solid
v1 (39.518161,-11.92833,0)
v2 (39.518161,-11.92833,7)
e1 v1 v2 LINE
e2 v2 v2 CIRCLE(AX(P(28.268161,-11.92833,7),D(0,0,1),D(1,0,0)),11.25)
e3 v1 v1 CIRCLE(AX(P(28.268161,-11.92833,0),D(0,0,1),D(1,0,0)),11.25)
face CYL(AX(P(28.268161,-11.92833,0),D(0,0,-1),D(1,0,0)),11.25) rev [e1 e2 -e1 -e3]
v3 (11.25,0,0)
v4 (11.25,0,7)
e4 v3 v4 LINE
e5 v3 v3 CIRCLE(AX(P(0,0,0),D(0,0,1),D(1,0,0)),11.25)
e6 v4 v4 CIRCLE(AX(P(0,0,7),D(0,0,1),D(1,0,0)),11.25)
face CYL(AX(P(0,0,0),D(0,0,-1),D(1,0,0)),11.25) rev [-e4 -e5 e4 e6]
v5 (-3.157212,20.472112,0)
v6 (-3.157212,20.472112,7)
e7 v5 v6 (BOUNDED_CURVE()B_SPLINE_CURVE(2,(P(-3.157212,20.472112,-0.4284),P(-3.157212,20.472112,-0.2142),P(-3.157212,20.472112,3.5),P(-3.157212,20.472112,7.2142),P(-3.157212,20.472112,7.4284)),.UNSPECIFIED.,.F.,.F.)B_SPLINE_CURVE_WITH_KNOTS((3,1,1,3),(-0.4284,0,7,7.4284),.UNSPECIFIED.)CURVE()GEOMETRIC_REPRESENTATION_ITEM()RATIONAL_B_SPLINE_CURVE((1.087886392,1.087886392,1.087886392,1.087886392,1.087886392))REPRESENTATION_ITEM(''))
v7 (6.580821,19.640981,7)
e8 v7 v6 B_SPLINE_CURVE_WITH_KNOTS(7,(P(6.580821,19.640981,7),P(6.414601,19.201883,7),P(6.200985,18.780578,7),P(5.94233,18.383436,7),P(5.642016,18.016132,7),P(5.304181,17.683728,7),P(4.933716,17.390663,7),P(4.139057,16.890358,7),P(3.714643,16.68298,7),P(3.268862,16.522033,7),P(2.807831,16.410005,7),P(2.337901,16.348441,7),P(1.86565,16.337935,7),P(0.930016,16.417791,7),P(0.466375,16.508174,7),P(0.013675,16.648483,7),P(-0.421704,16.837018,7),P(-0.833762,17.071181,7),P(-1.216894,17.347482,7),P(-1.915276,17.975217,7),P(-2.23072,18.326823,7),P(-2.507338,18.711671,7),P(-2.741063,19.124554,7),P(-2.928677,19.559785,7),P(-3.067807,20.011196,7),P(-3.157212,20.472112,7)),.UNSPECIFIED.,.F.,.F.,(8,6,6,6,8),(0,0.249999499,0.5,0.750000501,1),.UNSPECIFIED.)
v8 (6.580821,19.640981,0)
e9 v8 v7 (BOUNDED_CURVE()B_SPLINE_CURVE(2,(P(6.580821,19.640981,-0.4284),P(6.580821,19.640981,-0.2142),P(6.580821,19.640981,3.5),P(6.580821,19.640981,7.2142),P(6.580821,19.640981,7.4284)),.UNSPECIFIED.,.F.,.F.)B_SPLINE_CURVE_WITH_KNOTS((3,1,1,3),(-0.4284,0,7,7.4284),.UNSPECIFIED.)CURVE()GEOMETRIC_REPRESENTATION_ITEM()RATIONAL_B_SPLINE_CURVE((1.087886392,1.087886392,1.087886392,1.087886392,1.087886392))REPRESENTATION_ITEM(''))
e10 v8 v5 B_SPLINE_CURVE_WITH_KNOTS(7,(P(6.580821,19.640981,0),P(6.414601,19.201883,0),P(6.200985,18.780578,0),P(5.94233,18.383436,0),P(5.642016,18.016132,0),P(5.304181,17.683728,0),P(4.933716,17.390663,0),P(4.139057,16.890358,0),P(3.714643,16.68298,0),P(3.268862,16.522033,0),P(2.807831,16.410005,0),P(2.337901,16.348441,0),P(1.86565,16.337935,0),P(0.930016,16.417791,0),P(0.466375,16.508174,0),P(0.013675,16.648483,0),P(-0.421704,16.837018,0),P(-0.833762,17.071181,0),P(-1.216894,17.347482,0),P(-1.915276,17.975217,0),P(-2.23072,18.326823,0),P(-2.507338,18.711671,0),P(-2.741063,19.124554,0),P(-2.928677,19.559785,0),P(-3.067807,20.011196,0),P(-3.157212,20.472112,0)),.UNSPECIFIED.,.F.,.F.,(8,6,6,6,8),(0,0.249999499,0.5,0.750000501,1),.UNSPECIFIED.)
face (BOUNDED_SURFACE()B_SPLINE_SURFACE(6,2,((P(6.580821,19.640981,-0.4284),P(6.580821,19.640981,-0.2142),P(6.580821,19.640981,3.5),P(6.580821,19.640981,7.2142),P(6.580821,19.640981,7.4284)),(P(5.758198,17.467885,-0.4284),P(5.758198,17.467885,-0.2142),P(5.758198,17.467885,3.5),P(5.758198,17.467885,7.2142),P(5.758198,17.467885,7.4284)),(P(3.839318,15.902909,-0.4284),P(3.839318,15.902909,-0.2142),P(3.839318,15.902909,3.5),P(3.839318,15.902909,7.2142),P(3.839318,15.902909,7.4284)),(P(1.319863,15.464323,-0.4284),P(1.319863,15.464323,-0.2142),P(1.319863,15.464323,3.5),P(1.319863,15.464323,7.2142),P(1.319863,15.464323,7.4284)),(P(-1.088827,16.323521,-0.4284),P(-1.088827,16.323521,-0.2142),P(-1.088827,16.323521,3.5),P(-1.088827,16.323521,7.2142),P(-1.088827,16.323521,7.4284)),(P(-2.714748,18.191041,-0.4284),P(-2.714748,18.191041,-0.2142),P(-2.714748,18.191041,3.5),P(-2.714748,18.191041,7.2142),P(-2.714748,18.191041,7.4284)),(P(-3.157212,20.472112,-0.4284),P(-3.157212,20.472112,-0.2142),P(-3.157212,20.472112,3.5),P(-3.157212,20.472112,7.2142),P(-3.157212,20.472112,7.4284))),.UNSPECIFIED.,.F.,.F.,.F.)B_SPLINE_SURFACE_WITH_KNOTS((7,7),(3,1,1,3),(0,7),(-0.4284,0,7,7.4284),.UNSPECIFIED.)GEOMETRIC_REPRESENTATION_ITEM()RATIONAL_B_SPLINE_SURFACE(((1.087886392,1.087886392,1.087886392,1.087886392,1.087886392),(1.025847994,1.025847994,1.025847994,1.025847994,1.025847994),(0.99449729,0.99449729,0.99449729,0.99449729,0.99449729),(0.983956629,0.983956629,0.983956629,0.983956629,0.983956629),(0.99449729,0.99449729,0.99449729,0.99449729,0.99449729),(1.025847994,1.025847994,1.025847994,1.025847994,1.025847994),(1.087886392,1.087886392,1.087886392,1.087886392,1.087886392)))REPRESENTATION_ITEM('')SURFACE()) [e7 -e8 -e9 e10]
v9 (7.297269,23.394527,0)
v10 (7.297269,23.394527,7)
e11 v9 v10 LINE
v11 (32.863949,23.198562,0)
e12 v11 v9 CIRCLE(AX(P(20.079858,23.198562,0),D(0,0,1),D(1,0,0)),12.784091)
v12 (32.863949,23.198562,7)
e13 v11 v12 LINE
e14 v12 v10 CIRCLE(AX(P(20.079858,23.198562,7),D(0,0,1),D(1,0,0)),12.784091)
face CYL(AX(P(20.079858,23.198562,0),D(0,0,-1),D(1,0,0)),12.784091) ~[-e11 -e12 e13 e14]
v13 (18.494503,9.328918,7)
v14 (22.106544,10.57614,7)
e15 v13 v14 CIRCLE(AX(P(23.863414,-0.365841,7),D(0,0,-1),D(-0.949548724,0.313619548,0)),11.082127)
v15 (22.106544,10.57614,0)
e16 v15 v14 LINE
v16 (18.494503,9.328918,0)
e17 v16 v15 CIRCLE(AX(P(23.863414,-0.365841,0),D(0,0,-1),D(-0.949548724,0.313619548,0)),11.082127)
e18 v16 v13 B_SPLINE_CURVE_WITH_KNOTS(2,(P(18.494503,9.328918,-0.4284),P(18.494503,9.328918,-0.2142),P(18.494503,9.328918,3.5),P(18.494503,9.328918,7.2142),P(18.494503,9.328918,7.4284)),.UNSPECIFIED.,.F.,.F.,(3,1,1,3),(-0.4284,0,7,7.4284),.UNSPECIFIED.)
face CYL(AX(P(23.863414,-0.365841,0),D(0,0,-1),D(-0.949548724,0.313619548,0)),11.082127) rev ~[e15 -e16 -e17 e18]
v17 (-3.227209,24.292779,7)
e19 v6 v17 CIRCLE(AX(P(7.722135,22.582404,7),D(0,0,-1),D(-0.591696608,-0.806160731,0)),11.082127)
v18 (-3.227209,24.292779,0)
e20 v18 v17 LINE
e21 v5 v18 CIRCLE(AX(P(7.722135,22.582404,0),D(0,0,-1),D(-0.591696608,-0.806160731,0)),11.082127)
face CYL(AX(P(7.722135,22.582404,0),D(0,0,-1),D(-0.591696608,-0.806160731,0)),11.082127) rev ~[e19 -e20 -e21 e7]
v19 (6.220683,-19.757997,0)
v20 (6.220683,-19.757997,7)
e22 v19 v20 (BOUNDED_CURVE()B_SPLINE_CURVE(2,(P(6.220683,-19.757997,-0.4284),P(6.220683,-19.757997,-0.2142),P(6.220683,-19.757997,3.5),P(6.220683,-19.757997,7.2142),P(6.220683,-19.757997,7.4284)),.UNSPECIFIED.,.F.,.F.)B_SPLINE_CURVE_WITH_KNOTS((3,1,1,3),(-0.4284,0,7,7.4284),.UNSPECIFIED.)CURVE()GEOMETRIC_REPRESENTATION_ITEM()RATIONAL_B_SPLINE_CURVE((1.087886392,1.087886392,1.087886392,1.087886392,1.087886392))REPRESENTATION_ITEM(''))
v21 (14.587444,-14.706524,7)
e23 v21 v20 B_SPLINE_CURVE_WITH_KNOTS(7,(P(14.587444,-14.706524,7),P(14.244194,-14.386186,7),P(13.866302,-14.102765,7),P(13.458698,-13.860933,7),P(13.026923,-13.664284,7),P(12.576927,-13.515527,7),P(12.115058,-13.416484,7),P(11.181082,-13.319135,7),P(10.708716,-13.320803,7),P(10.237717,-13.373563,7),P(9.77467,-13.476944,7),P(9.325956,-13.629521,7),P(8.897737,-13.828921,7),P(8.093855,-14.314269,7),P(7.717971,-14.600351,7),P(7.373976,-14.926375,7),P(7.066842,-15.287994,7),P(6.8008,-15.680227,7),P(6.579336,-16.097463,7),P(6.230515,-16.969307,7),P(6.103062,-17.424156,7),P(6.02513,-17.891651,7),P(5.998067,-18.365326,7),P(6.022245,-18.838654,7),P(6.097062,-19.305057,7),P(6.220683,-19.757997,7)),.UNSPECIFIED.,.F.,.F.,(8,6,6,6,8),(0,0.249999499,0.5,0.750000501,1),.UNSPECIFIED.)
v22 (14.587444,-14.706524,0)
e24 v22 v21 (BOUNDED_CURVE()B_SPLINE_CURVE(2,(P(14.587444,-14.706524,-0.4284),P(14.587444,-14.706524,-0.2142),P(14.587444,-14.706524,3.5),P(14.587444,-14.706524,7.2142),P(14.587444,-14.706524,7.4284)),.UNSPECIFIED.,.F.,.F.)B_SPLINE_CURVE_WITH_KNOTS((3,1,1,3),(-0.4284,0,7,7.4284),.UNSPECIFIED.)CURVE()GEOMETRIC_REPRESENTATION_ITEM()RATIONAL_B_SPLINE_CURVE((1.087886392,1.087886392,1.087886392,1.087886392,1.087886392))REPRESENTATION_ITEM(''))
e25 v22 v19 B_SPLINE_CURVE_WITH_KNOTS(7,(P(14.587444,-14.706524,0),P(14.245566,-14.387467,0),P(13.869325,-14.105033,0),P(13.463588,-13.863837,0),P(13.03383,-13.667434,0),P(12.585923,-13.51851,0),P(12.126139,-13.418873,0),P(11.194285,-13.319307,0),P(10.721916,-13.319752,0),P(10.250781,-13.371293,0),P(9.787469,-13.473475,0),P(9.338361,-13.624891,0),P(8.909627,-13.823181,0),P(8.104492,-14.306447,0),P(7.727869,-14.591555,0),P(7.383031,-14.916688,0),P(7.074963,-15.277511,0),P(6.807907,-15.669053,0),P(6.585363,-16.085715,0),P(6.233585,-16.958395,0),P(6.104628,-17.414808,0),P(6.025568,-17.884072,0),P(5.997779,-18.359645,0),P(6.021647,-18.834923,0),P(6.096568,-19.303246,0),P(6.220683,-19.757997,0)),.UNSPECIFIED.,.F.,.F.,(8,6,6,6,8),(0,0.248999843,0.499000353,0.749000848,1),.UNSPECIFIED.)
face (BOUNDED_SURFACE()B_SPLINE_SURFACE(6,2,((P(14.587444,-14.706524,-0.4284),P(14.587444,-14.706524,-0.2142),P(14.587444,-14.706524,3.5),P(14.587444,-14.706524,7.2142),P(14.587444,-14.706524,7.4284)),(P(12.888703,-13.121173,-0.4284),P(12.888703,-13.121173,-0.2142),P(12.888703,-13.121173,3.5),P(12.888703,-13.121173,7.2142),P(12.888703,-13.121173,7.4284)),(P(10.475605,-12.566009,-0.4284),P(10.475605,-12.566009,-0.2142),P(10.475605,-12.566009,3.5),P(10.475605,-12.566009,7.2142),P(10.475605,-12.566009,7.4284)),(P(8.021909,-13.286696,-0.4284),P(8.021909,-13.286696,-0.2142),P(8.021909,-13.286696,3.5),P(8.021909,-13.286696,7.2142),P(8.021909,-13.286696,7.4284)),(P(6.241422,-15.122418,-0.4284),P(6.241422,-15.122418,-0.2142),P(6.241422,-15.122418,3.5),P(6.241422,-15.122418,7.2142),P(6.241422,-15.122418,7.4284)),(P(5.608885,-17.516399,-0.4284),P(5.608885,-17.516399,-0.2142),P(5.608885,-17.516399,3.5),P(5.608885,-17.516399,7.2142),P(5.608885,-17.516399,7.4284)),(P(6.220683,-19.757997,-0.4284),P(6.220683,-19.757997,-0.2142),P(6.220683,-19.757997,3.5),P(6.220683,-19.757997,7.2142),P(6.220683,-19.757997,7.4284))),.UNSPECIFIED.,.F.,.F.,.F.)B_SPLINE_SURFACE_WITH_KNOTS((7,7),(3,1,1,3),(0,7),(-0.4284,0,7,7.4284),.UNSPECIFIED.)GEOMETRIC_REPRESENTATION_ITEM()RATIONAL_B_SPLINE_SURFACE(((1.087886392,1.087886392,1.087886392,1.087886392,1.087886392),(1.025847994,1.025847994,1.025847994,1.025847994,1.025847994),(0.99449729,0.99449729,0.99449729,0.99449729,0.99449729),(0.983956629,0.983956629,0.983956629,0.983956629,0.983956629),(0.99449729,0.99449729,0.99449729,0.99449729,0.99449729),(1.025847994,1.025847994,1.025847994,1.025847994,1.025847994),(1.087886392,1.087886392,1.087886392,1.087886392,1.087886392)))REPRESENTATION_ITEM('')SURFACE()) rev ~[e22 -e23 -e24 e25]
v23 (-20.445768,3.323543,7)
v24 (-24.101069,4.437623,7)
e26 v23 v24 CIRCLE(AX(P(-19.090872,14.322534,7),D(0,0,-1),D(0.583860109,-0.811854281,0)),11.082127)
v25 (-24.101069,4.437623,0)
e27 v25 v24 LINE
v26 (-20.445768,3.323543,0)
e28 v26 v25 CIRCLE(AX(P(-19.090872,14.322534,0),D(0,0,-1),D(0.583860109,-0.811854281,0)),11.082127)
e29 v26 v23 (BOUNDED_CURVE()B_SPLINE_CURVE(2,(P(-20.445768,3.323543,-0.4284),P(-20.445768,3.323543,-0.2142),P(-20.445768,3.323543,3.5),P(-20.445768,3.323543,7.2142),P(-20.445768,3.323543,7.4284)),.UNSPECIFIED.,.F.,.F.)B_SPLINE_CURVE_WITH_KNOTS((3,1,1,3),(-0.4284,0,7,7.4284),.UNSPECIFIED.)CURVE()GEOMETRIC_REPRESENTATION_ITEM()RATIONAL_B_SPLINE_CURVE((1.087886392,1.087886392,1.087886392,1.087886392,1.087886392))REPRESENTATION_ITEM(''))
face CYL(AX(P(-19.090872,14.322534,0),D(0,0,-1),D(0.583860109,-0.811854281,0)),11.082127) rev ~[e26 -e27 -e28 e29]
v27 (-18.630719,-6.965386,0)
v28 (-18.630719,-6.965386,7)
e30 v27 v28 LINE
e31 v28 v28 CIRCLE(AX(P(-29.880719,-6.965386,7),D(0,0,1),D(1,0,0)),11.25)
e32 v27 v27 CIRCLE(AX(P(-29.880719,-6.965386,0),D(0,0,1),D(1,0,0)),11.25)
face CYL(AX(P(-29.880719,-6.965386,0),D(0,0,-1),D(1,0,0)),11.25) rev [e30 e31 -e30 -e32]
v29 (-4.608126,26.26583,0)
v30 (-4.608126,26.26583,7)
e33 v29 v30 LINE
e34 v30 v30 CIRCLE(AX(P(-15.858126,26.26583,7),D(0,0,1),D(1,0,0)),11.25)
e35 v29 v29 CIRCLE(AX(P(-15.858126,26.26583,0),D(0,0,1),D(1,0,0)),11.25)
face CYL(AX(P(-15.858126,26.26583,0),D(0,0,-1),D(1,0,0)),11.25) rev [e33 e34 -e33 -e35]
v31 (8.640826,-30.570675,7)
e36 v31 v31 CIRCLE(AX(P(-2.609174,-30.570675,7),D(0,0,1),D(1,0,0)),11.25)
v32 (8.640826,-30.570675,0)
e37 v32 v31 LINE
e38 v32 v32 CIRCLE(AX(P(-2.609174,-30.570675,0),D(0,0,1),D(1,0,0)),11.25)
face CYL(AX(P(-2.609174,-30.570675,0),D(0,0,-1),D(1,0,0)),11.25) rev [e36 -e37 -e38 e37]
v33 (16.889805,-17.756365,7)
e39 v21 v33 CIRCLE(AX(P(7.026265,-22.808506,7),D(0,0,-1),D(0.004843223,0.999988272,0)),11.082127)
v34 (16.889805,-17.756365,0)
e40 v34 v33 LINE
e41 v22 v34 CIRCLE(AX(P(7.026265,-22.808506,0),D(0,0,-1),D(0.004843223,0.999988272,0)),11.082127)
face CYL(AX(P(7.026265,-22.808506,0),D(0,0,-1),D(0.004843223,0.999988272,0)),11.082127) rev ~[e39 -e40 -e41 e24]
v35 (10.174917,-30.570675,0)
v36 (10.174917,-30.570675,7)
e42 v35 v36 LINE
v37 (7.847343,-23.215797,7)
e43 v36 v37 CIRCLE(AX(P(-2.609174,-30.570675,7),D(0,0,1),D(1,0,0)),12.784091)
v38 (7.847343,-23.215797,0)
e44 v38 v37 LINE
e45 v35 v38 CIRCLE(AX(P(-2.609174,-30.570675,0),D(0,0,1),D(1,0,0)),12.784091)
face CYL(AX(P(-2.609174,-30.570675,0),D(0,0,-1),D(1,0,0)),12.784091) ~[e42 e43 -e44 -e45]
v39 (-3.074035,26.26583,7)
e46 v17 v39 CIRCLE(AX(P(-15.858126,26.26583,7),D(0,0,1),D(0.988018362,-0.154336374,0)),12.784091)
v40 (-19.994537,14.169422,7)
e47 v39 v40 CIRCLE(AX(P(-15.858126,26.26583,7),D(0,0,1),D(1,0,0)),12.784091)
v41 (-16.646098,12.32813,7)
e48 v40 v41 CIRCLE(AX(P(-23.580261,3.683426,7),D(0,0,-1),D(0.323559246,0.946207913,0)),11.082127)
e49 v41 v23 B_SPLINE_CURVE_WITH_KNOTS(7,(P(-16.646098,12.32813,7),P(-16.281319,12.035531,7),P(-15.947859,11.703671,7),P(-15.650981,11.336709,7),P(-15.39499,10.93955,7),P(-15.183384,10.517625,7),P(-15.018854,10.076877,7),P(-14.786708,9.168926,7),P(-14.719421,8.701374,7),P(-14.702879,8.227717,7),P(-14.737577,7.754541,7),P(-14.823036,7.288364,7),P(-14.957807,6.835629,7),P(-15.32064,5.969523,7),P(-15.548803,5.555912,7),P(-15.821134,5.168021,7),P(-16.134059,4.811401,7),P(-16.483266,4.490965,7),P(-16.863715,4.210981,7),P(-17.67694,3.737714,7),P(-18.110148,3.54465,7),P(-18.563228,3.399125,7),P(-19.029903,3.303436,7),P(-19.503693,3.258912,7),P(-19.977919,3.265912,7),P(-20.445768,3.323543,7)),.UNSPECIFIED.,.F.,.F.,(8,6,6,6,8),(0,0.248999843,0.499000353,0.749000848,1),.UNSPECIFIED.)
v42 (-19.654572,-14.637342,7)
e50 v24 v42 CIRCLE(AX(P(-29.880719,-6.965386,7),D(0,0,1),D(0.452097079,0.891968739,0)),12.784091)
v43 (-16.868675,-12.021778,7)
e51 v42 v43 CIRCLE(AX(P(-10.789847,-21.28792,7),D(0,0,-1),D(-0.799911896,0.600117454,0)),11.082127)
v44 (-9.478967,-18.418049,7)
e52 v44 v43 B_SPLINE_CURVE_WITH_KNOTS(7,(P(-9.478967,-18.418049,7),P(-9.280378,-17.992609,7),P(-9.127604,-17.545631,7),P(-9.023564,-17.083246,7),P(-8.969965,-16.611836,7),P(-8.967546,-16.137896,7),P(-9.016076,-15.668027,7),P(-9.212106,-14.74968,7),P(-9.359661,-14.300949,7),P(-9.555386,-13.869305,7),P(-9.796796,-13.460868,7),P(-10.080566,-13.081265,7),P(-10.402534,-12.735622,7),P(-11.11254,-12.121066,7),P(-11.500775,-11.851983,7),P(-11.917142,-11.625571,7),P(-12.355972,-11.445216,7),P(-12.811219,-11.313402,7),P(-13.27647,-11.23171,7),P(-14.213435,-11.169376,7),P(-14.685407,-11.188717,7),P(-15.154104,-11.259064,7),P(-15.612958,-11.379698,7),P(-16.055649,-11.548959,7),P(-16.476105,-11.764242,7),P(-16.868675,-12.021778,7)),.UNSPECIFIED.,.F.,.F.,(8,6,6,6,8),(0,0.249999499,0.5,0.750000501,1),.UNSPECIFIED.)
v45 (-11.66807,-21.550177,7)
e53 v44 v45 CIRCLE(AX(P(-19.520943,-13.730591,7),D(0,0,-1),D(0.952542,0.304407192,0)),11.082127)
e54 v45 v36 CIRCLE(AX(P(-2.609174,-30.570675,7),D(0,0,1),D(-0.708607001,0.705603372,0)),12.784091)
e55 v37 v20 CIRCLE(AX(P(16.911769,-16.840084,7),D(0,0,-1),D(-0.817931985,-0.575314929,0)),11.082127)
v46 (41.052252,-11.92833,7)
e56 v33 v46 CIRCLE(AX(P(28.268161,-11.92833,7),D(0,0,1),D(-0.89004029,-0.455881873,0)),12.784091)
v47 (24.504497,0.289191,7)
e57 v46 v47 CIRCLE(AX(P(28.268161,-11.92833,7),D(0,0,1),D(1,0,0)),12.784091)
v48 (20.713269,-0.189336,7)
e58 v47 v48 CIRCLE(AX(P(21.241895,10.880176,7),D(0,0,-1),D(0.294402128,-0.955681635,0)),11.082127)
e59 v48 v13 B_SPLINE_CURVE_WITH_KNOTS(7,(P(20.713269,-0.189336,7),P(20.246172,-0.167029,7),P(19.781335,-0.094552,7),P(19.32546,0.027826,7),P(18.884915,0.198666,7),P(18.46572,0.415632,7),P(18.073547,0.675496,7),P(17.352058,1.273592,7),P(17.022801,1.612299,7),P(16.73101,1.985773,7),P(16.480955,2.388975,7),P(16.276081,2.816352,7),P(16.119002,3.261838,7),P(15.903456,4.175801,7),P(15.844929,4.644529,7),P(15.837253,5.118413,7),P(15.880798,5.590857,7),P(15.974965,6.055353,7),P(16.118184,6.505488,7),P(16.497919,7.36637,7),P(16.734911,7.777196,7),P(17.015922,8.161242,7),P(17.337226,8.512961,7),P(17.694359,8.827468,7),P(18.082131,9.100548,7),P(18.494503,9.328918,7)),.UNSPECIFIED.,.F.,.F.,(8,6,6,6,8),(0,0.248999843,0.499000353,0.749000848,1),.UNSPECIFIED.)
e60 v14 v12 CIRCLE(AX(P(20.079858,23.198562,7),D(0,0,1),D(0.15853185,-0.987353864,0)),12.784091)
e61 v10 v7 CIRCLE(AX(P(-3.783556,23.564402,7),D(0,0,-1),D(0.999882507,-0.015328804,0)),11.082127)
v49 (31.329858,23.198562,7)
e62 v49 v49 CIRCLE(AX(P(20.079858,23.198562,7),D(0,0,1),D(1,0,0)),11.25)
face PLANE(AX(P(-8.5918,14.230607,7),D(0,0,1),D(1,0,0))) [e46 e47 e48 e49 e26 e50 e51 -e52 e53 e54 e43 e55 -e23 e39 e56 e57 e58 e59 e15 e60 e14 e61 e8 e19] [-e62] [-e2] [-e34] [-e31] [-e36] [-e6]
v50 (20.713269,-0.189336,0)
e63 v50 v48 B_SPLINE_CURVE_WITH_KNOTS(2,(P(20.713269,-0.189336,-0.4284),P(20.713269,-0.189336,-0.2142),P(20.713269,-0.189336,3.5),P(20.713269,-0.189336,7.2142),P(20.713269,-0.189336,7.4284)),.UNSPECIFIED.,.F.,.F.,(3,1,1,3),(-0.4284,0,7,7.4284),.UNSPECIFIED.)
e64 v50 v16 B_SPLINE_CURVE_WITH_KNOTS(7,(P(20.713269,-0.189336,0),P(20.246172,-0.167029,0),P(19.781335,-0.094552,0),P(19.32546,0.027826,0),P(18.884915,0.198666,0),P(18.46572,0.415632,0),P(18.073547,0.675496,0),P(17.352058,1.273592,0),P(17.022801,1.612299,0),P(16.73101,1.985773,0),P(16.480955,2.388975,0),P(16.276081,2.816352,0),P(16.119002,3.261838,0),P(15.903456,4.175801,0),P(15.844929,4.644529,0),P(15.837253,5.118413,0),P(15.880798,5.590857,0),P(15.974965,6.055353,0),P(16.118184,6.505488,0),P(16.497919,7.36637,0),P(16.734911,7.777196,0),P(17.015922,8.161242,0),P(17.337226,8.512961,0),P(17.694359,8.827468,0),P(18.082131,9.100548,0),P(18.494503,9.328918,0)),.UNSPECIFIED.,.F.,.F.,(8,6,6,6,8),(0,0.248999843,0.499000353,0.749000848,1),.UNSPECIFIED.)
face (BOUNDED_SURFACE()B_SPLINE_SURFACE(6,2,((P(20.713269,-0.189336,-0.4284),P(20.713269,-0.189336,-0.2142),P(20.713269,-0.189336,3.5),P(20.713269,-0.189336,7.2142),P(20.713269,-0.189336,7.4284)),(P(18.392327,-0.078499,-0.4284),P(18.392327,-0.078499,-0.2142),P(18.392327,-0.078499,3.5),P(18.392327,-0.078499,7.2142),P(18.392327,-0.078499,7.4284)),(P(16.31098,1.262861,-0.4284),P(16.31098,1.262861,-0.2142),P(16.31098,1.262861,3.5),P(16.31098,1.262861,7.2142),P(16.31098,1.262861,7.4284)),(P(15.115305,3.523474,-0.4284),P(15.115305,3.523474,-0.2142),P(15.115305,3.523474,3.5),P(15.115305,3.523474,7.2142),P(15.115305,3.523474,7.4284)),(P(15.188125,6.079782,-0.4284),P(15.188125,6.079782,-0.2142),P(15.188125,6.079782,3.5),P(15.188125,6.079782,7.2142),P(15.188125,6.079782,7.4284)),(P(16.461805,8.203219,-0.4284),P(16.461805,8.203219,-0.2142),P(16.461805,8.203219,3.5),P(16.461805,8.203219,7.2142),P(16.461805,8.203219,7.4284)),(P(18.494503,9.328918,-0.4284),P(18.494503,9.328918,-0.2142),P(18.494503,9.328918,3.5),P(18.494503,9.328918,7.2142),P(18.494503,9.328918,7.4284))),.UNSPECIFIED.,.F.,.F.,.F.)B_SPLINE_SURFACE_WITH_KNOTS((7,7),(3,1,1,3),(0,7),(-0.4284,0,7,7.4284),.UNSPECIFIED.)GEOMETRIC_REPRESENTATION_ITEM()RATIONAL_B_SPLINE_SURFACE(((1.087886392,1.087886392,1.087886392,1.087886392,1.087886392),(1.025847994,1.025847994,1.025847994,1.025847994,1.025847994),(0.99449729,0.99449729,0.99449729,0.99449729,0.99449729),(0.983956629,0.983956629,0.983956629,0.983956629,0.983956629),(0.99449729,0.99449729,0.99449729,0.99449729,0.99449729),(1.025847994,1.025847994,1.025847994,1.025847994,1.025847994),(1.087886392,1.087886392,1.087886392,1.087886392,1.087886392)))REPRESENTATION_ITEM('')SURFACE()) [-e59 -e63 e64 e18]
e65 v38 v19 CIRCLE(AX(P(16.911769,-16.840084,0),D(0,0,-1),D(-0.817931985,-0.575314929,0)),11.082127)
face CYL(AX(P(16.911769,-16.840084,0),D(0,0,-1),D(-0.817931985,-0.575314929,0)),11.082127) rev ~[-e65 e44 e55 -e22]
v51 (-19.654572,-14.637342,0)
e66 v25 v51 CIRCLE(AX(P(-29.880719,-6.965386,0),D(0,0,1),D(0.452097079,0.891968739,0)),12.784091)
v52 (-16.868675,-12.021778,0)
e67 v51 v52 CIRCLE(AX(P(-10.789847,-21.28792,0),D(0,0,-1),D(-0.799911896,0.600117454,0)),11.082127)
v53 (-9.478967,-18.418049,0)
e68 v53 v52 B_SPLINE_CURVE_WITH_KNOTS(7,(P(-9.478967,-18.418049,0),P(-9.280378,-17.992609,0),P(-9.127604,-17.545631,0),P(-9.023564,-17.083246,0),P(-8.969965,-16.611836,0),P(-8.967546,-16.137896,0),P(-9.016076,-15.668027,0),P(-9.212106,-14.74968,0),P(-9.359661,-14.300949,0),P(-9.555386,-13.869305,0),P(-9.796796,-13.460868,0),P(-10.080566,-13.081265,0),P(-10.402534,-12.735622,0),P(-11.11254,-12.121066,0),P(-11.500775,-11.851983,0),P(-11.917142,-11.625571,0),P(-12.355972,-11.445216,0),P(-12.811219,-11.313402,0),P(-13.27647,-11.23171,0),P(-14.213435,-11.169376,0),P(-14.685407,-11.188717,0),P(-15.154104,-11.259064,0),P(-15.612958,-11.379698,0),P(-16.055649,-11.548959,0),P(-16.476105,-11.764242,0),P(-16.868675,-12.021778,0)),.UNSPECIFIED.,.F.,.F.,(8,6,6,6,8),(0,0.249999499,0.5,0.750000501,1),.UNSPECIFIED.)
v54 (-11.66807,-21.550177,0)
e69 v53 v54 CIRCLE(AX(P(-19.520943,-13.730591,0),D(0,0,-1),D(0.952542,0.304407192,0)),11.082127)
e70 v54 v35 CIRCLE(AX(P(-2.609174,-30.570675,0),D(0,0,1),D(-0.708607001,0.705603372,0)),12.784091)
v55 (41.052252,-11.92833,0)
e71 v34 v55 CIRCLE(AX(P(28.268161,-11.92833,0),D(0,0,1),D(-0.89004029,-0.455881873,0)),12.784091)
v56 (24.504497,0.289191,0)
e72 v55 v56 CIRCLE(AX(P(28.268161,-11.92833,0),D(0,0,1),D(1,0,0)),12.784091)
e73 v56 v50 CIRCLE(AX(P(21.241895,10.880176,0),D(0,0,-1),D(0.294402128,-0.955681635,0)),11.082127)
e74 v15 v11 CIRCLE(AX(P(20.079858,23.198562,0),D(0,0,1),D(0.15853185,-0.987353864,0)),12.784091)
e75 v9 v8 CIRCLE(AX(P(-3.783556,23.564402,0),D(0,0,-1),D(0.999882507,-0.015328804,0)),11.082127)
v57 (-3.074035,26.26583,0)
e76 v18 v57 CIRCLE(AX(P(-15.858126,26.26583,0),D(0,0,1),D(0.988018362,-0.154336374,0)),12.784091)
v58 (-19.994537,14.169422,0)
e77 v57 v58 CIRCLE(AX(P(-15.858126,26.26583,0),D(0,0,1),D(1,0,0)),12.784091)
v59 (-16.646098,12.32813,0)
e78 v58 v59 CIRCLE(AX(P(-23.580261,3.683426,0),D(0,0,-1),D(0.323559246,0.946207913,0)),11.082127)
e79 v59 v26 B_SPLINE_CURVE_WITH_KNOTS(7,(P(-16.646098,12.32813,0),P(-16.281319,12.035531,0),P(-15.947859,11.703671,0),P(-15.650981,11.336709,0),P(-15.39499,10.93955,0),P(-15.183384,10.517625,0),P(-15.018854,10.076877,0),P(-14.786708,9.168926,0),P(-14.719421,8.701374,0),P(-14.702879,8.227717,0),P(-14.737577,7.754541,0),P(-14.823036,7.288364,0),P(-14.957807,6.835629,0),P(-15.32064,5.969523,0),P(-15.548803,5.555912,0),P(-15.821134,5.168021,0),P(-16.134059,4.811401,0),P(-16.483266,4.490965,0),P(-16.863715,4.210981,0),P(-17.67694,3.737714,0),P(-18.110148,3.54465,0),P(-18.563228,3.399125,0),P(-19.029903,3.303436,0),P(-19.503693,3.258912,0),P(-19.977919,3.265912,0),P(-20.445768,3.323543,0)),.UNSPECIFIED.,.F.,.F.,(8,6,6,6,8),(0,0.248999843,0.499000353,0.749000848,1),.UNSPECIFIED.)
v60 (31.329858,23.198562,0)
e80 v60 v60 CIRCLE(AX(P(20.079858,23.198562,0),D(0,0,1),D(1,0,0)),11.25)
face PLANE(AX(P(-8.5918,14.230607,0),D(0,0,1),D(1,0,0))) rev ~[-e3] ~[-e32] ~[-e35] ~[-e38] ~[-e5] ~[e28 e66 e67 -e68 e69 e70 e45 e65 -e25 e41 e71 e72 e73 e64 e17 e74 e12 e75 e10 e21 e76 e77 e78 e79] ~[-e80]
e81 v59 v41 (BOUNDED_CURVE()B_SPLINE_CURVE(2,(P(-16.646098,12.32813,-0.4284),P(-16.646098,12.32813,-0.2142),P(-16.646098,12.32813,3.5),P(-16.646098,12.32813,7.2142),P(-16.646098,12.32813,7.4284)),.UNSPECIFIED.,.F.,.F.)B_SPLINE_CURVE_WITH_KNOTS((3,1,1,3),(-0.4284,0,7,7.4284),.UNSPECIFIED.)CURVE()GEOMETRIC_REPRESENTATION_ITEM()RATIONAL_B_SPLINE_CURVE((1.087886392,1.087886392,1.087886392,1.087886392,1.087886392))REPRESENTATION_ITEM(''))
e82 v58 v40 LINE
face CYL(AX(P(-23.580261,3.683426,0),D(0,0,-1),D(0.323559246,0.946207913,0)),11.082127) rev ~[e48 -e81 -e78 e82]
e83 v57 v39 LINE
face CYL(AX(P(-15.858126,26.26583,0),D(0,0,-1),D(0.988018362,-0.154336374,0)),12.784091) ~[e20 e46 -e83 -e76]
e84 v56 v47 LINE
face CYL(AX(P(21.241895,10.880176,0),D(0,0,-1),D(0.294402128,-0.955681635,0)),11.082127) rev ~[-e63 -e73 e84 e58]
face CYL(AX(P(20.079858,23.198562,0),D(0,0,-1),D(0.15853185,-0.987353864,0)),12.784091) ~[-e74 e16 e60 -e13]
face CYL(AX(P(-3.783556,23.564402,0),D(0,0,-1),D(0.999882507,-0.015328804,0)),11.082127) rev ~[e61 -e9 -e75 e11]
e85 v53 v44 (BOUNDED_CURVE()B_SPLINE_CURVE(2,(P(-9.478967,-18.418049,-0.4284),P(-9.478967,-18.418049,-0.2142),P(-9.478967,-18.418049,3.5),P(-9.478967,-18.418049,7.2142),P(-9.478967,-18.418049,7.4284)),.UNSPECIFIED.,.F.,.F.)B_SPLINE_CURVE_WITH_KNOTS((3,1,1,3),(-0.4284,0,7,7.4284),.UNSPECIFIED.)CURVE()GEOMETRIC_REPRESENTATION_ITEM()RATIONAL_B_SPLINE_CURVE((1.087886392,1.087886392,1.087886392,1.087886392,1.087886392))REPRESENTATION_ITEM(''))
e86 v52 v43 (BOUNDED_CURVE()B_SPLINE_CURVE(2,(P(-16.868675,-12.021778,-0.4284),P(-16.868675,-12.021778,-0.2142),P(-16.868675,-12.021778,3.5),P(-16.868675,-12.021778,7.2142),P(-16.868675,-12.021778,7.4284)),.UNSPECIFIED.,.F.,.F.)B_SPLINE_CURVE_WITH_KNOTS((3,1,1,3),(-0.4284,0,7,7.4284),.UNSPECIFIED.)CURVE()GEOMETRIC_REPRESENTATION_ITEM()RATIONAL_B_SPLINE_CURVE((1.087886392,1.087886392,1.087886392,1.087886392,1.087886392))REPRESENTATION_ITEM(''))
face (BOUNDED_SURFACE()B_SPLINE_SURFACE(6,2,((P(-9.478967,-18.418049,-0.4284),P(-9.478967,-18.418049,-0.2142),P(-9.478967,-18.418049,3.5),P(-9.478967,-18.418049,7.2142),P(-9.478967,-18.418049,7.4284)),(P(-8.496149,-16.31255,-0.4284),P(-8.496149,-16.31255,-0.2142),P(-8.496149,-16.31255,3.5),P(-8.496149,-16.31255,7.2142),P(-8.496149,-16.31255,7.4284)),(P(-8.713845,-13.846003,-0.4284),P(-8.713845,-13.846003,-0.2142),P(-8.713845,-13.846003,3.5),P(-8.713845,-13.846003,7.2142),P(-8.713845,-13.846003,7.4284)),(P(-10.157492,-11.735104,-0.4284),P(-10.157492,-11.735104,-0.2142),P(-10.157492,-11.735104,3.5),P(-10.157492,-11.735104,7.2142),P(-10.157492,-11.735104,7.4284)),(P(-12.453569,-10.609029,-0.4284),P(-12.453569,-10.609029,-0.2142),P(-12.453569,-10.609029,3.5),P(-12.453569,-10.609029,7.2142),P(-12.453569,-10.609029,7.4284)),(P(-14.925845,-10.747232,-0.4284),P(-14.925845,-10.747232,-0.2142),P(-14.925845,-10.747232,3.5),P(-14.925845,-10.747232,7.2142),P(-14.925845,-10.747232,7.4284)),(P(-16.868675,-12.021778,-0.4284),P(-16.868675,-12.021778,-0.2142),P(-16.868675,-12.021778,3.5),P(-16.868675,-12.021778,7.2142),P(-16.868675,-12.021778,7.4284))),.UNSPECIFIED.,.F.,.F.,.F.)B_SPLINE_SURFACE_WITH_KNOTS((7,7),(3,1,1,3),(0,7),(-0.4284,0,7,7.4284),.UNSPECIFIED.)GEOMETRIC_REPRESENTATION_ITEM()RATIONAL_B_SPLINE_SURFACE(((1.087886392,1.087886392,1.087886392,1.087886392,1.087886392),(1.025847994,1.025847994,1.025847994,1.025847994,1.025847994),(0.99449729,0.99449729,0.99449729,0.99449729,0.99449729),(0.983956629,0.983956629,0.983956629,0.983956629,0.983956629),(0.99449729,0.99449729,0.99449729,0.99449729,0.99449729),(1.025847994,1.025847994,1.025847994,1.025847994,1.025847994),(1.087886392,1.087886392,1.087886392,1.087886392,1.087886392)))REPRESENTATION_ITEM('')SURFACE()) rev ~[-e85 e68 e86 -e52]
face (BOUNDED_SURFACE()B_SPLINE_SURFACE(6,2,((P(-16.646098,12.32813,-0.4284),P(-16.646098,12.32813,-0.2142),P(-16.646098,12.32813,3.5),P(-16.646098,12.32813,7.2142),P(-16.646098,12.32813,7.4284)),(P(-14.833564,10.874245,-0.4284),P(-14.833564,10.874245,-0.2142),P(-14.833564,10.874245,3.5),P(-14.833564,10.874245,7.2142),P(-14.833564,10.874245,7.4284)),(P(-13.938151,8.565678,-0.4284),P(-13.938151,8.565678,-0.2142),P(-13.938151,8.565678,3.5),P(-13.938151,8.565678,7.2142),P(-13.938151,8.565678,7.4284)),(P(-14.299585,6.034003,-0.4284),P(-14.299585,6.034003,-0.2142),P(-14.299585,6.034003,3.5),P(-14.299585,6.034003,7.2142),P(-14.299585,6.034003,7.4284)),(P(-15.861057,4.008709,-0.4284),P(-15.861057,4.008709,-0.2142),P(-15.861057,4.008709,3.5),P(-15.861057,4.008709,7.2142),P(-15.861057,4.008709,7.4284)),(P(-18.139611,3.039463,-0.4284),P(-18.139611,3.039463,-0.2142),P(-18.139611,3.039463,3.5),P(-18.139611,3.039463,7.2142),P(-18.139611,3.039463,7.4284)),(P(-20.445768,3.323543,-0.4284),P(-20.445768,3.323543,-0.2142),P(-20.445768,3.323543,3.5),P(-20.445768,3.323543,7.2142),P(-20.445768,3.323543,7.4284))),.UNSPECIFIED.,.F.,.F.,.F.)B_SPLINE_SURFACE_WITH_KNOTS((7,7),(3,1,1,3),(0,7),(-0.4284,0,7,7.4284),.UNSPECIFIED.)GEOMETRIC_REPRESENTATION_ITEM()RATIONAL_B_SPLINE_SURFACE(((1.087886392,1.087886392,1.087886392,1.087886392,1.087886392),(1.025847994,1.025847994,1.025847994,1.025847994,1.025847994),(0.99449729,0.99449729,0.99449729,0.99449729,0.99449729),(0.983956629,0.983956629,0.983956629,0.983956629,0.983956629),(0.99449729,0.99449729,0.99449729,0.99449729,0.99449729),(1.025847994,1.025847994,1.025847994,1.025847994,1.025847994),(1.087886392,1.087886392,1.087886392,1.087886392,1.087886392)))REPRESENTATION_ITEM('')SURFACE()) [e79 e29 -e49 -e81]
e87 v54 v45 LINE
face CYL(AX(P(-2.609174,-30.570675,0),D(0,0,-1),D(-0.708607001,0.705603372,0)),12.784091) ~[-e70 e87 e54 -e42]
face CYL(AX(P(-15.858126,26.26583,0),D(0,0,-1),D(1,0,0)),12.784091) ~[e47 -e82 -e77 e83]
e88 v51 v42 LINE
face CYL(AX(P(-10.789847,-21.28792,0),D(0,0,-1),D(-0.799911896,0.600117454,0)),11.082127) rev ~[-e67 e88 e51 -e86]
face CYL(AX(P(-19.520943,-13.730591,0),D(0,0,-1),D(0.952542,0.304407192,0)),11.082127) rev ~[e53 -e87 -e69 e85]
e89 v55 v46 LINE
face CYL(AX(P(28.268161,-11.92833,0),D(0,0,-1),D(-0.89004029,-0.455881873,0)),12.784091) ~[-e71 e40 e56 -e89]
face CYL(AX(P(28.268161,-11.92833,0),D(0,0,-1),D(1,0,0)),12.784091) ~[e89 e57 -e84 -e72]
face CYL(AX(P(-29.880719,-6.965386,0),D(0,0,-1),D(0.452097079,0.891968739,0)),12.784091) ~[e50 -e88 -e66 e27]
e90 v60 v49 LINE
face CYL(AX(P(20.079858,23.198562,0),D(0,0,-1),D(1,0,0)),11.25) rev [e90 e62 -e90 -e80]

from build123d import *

# Parameters (mm, degrees)
F0_R     = 11.25
F1_DEPTH = 7
F2_R     = 5.08


# Not quite as in the source:
# - a feature names something its author has since deleted; it is built from what else it names


with BuildPart() as f1:
    # F0 (on Top) → F1 (new body)
    with BuildSketch(Plane.XY):
        with BuildLine():
            ThreePointArc((-10.2261463935, 7.6719560941), (-6.6075524932, 10.9440956877), (-2.0266855863, 12.6224215548))
            ThreePointArc((-2.0266855863, 12.6224215548), (-0.3918821811, 13.0140427744), (1.1648785444, 13.648428617))
            ThreePointArc((1.1648785444, 13.648428617), (-2.5221716271, 18.3553828089), (-3.2272094242, 24.2927794132))
            ThreePointArc((-3.2272094242, 24.2927794132), (-9.2505734905, 15.3217339628), (-19.9945367973, 14.1694216731))
            ThreePointArc((-19.9945367973, 14.1694216731), (-15.0686816006, 10.7803646784), (-12.6204597068, 5.3254617195))
            ThreePointArc((-12.6204597068, 5.3254617195), (-11.3340606288, 6.4076478244), (-10.2261463935, 7.6719560941))
        make_face()
        with BuildLine():
            ThreePointArc((12.7825888677, -0.1959648224), (12.7837153932, -0.0979852894), (12.7840909091, 0))
            ThreePointArc((12.7840909091, 0), (12.4276891989, 2.9975859532), (11.3783559826, 5.828035304))
            ThreePointArc((11.3783559826, 5.828035304), (8.3666075071, 9.666067411), (4.1364108135, 12.0964079773))
            ThreePointArc((4.1364108135, 12.0964079773), (1.0871557866, 12.7377813087), (-2.0266855863, 12.6224215548))
            ThreePointArc((-2.0266855863, 12.6224215548), (-6.6075524932, 10.9440956877), (-10.2261463935, 7.6719560941))
            ThreePointArc((-10.2261463935, 7.6719560941), (-11.7784003031, 4.9701374901), (-12.6309165595, 1.9730502372))
            ThreePointArc((-12.6309165595, 1.9730502372), (-12.4502995304, -2.9022442999), (-10.4565168586, -7.3548783509))
            ThreePointArc((-10.4565168586, -7.3548783509), (-8.3666075071, -9.666067411), (-5.7796501565, -11.4030094467))
            ThreePointArc((-5.7796501565, -11.4030094467), (-1.0871557866, -12.7377813087), (3.7636635709, -12.2175208981))
            ThreePointArc((3.7636635709, -12.2175208981), (6.6075524932, -10.9440956877), (9.0588963197, -9.0204976493))
            ThreePointArc((9.0588963197, -9.0204976493), (11.7784003031, -4.9701374901), (12.7825888677, -0.1959648224))
        make_face()
        Circle(F0_R, mode=Mode.SUBTRACT)
        with BuildLine():
            ThreePointArc((-2.0266855863, 12.6224215548), (1.0871557866, 12.7377813087), (4.1364108135, 12.0964079773))
            ThreePointArc((4.1364108135, 12.0964079773), (2.591617868, 12.7594042888), (1.1648785444, 13.648428617))
            ThreePointArc((1.1648785444, 13.648428617), (-0.3918821811, 13.0140427744), (-2.0266855863, 12.6224215548))
        make_face()
        with BuildLine():
            ThreePointArc((11.3783559826, 5.828035304), (12.4276891989, 2.9975859532), (12.7840909091, 0))
            ThreePointArc((12.7840909091, 0), (12.7837153932, -0.0979852894), (12.7825888677, -0.1959648224))
            ThreePointArc((12.7825888677, -0.1959648224), (12.935768557, 1.4780977023), (13.34039424, 3.1097310588))
            ThreePointArc((13.34039424, 3.1097310588), (12.2559919302, 4.3942624848), (11.3783559826, 5.828035304))
        make_face()
        with BuildLine():
            ThreePointArc((-12.6309165595, 1.9730502372), (-11.7784003031, 4.9701374901), (-10.2261463935, 7.6719560941))
            ThreePointArc((-10.2261463935, 7.6719560941), (-11.3340606288, 6.4076478244), (-12.6204597068, 5.3254617195))
            ThreePointArc((-12.6204597068, 5.3254617195), (-12.4981884377, 3.6488582809), (-12.6309165595, 1.9730502372))
        make_face()
        with BuildLine():
            ThreePointArc((-10.4565168586, -7.3548783509), (-12.4502995304, -2.9022442999), (-12.6309165595, 1.9730502372))
            ThreePointArc((-12.6309165595, 1.9730502372), (-12.4981884377, 3.6488582809), (-12.6204597068, 5.3254617195))
            ThreePointArc((-12.6204597068, 5.3254617195), (-18.236400325, 3.273397465), (-24.1010687164, 4.4376231269))
            ThreePointArc((-24.1010687164, 4.4376231269), (-18.9875890794, -0.2741455025), (-17.0966279638, -6.9653863197))
            ThreePointArc((-17.0966279638, -6.9653863197), (-17.7529621653, -11.0089611755), (-19.6545724794, -14.6373424139))
            ThreePointArc((-19.6545724794, -14.6373424139), (-14.9092147728, -10.999851937), (-8.9647515968, -10.3571122686))
            ThreePointArc((-8.9647515968, -10.3571122686), (-9.5964525671, -8.7992601454), (-10.4565168586, -7.3548783509))
        make_face()
        with BuildLine():
            ThreePointArc((4.1364108135, 12.0964079773), (8.3666075071, 9.666067411), (11.3783559826, 5.828035304))
            ThreePointArc((11.3783559826, 5.828035304), (12.2559919302, 4.3942624848), (13.34039424, 3.1097310588))
            ThreePointArc((13.34039424, 3.1097310588), (16.677612534, 8.0708529874), (22.1065436034, 10.5761402317))
            ThreePointArc((22.1065436034, 10.5761402317), (11.7132505099, 13.5324943754), (7.2972691493, 23.3945266088))
            ThreePointArc((7.2972691493, 23.3945266088), (5.596257378, 17.6624837194), (1.1648785444, 13.648428617))
            ThreePointArc((1.1648785444, 13.648428617), (2.591617868, 12.7594042888), (4.1364108135, 12.0964079773))
        make_face()
        with BuildLine():
            ThreePointArc((13.34039424, 3.1097310588), (12.935768557, 1.4780977023), (12.7825888677, -0.1959648224))
            ThreePointArc((12.7825888677, -0.1959648224), (11.7784003031, -4.9701374901), (9.0588963197, -9.0204976493))
            ThreePointArc((9.0588963197, -9.0204976493), (7.9665017598, -10.2982392034), (7.0799385192, -11.7265091268))
            ThreePointArc((7.0799385192, -11.7265091268), (12.8295030243, -13.3673213445), (16.8898047449, -17.7563652803))
            ThreePointArc((16.8898047449, -17.7563652803), (16.4897604244, -6.9581924862), (24.5044971566, 0.2891909218))
            ThreePointArc((24.5044971566, 0.2891909218), (18.52735887, 0.1356505859), (13.34039424, 3.1097310588))
        make_face()
        with BuildLine():
            ThreePointArc((7.0799385192, -11.7265091268), (7.9665017598, -10.2982392034), (9.0588963197, -9.0204976493))
            ThreePointArc((9.0588963197, -9.0204976493), (6.6075524932, -10.9440956877), (3.7636635709, -12.2175208981))
            ThreePointArc((3.7636635709, -12.2175208981), (5.4031267709, -11.8458896701), (7.0799385192, -11.7265091268))
        make_face()
        with BuildLine():
            ThreePointArc((-8.9647515968, -10.3571122686), (-7.3324230712, -10.7589243367), (-5.7796501565, -11.4030094467))
            ThreePointArc((-5.7796501565, -11.4030094467), (-8.3666075071, -9.666067411), (-10.4565168586, -7.3548783509))
            ThreePointArc((-10.4565168586, -7.3548783509), (-9.5964525671, -8.7992601454), (-8.9647515968, -10.3571122686))
        make_face()
        with BuildLine():
            ThreePointArc((7.0799385192, -11.7265091268), (5.4031267709, -11.8458896701), (3.7636635709, -12.2175208981))
            ThreePointArc((3.7636635709, -12.2175208981), (-1.0871557866, -12.7377813087), (-5.7796501565, -11.4030094467))
            ThreePointArc((-5.7796501565, -11.4030094467), (-7.3324230712, -10.7589243367), (-8.9647515968, -10.3571122686))
            ThreePointArc((-8.9647515968, -10.3571122686), (-8.7485436062, -16.3323119169), (-11.6680702077, -21.5501774915))
            ThreePointArc((-11.6680702077, -21.5501774915), (-1.5220181013, -17.8328938321), (7.8473429707, -23.2157967899))
            ThreePointArc((7.8473429707, -23.2157967899), (5.8542801254, -17.5786470467), (7.0799385192, -11.7265091268))
        make_face()
        with BuildLine():
            ThreePointArc((41.0522516366, -11.9283299763), (35.8615118695, -1.64368128), (24.5044971566, 0.2891909218))
            ThreePointArc((24.5044971566, 0.2891909218), (16.4897604244, -6.9581924862), (16.8898047449, -17.7563652803))
            ThreePointArc((16.8898047449, -17.7563652803), (31.2657466808, -24.3560191752), (41.0522516366, -11.9283299763))
        make_face()
        with Locations((28.2681607275, -11.9283299763)):
            Circle(F0_R, mode=Mode.SUBTRACT)
        with BuildLine():
            ThreePointArc((10.1749170211, -30.5706751408), (9.5791410589, -26.713479381), (7.8473429707, -23.2157967899))
            ThreePointArc((7.8473429707, -23.2157967899), (-1.5220181013, -17.8328938321), (-11.6680702077, -21.5501774915))
            ThreePointArc((-11.6680702077, -21.5501774915), (-7.4888883409, -42.3868237193), (10.1749170211, -30.5706751408))
        make_face()
        with Locations((-2.6091738879, -30.5706751408)):
            Circle(F0_R, mode=Mode.SUBTRACT)
        with BuildLine():
            ThreePointArc((-17.0966279638, -6.9653863197), (-18.9875890794, -0.2741455025), (-24.1010687164, 4.4376231269))
            ThreePointArc((-24.1010687164, 4.4376231269), (-42.3310184032, -9.8676306196), (-19.6545724794, -14.6373424139))
            ThreePointArc((-19.6545724794, -14.6373424139), (-17.7529621653, -11.0089611755), (-17.0966279638, -6.9653863197))
        make_face()
        with Locations((-29.8807188729, -6.9653863197)):
            Circle(F0_R, mode=Mode.SUBTRACT)
        with BuildLine():
            ThreePointArc((-19.9945367973, 14.1694216731), (-9.2505734905, 15.3217339628), (-3.2272094242, 24.2927794132))
            ThreePointArc((-3.2272094242, 24.2927794132), (-3.112386187, 25.2763361411), (-3.0740350747, 26.2658296504))
            ThreePointArc((-3.0740350747, 26.2658296504), (-23.2929335971, 36.6656669628), (-19.9945367973, 14.1694216731))
        make_face()
        with Locations((-15.8581259838, 26.2658296504)):
            Circle(F0_R, mode=Mode.SUBTRACT)
        with BuildLine():
            ThreePointArc((7.2972691493, 23.3945266088), (11.7132505099, 13.5324943754), (22.1065436034, 10.5761402317))
            ThreePointArc((22.1065436034, 10.5761402317), (29.8097684265, 14.9062868395), (32.8639489261, 23.1985617864))
            ThreePointArc((32.8639489261, 23.1985617864), (20.1778433064, 35.9822771796), (7.2972691493, 23.3945266088))
        make_face()
        with Locations((20.079858017, 23.1985617864)):
            Circle(F0_R, mode=Mode.SUBTRACT)
    extrude(amount=F1_DEPTH)

    # F2
    f2_edges = [f1.edges().sort_by_distance(p)[0] for p in [
        (7.079939, -11.726509, 3.5),
        (-8.964752, -10.357112, 3.5),
        (-12.62046, 5.325462, 3.5),
        (1.164879, 13.648429, 3.5),
        (13.340394, 3.109731, 3.5),
    ]]
    fillet(f2_edges, radius=F2_R)


solid = f1.part
